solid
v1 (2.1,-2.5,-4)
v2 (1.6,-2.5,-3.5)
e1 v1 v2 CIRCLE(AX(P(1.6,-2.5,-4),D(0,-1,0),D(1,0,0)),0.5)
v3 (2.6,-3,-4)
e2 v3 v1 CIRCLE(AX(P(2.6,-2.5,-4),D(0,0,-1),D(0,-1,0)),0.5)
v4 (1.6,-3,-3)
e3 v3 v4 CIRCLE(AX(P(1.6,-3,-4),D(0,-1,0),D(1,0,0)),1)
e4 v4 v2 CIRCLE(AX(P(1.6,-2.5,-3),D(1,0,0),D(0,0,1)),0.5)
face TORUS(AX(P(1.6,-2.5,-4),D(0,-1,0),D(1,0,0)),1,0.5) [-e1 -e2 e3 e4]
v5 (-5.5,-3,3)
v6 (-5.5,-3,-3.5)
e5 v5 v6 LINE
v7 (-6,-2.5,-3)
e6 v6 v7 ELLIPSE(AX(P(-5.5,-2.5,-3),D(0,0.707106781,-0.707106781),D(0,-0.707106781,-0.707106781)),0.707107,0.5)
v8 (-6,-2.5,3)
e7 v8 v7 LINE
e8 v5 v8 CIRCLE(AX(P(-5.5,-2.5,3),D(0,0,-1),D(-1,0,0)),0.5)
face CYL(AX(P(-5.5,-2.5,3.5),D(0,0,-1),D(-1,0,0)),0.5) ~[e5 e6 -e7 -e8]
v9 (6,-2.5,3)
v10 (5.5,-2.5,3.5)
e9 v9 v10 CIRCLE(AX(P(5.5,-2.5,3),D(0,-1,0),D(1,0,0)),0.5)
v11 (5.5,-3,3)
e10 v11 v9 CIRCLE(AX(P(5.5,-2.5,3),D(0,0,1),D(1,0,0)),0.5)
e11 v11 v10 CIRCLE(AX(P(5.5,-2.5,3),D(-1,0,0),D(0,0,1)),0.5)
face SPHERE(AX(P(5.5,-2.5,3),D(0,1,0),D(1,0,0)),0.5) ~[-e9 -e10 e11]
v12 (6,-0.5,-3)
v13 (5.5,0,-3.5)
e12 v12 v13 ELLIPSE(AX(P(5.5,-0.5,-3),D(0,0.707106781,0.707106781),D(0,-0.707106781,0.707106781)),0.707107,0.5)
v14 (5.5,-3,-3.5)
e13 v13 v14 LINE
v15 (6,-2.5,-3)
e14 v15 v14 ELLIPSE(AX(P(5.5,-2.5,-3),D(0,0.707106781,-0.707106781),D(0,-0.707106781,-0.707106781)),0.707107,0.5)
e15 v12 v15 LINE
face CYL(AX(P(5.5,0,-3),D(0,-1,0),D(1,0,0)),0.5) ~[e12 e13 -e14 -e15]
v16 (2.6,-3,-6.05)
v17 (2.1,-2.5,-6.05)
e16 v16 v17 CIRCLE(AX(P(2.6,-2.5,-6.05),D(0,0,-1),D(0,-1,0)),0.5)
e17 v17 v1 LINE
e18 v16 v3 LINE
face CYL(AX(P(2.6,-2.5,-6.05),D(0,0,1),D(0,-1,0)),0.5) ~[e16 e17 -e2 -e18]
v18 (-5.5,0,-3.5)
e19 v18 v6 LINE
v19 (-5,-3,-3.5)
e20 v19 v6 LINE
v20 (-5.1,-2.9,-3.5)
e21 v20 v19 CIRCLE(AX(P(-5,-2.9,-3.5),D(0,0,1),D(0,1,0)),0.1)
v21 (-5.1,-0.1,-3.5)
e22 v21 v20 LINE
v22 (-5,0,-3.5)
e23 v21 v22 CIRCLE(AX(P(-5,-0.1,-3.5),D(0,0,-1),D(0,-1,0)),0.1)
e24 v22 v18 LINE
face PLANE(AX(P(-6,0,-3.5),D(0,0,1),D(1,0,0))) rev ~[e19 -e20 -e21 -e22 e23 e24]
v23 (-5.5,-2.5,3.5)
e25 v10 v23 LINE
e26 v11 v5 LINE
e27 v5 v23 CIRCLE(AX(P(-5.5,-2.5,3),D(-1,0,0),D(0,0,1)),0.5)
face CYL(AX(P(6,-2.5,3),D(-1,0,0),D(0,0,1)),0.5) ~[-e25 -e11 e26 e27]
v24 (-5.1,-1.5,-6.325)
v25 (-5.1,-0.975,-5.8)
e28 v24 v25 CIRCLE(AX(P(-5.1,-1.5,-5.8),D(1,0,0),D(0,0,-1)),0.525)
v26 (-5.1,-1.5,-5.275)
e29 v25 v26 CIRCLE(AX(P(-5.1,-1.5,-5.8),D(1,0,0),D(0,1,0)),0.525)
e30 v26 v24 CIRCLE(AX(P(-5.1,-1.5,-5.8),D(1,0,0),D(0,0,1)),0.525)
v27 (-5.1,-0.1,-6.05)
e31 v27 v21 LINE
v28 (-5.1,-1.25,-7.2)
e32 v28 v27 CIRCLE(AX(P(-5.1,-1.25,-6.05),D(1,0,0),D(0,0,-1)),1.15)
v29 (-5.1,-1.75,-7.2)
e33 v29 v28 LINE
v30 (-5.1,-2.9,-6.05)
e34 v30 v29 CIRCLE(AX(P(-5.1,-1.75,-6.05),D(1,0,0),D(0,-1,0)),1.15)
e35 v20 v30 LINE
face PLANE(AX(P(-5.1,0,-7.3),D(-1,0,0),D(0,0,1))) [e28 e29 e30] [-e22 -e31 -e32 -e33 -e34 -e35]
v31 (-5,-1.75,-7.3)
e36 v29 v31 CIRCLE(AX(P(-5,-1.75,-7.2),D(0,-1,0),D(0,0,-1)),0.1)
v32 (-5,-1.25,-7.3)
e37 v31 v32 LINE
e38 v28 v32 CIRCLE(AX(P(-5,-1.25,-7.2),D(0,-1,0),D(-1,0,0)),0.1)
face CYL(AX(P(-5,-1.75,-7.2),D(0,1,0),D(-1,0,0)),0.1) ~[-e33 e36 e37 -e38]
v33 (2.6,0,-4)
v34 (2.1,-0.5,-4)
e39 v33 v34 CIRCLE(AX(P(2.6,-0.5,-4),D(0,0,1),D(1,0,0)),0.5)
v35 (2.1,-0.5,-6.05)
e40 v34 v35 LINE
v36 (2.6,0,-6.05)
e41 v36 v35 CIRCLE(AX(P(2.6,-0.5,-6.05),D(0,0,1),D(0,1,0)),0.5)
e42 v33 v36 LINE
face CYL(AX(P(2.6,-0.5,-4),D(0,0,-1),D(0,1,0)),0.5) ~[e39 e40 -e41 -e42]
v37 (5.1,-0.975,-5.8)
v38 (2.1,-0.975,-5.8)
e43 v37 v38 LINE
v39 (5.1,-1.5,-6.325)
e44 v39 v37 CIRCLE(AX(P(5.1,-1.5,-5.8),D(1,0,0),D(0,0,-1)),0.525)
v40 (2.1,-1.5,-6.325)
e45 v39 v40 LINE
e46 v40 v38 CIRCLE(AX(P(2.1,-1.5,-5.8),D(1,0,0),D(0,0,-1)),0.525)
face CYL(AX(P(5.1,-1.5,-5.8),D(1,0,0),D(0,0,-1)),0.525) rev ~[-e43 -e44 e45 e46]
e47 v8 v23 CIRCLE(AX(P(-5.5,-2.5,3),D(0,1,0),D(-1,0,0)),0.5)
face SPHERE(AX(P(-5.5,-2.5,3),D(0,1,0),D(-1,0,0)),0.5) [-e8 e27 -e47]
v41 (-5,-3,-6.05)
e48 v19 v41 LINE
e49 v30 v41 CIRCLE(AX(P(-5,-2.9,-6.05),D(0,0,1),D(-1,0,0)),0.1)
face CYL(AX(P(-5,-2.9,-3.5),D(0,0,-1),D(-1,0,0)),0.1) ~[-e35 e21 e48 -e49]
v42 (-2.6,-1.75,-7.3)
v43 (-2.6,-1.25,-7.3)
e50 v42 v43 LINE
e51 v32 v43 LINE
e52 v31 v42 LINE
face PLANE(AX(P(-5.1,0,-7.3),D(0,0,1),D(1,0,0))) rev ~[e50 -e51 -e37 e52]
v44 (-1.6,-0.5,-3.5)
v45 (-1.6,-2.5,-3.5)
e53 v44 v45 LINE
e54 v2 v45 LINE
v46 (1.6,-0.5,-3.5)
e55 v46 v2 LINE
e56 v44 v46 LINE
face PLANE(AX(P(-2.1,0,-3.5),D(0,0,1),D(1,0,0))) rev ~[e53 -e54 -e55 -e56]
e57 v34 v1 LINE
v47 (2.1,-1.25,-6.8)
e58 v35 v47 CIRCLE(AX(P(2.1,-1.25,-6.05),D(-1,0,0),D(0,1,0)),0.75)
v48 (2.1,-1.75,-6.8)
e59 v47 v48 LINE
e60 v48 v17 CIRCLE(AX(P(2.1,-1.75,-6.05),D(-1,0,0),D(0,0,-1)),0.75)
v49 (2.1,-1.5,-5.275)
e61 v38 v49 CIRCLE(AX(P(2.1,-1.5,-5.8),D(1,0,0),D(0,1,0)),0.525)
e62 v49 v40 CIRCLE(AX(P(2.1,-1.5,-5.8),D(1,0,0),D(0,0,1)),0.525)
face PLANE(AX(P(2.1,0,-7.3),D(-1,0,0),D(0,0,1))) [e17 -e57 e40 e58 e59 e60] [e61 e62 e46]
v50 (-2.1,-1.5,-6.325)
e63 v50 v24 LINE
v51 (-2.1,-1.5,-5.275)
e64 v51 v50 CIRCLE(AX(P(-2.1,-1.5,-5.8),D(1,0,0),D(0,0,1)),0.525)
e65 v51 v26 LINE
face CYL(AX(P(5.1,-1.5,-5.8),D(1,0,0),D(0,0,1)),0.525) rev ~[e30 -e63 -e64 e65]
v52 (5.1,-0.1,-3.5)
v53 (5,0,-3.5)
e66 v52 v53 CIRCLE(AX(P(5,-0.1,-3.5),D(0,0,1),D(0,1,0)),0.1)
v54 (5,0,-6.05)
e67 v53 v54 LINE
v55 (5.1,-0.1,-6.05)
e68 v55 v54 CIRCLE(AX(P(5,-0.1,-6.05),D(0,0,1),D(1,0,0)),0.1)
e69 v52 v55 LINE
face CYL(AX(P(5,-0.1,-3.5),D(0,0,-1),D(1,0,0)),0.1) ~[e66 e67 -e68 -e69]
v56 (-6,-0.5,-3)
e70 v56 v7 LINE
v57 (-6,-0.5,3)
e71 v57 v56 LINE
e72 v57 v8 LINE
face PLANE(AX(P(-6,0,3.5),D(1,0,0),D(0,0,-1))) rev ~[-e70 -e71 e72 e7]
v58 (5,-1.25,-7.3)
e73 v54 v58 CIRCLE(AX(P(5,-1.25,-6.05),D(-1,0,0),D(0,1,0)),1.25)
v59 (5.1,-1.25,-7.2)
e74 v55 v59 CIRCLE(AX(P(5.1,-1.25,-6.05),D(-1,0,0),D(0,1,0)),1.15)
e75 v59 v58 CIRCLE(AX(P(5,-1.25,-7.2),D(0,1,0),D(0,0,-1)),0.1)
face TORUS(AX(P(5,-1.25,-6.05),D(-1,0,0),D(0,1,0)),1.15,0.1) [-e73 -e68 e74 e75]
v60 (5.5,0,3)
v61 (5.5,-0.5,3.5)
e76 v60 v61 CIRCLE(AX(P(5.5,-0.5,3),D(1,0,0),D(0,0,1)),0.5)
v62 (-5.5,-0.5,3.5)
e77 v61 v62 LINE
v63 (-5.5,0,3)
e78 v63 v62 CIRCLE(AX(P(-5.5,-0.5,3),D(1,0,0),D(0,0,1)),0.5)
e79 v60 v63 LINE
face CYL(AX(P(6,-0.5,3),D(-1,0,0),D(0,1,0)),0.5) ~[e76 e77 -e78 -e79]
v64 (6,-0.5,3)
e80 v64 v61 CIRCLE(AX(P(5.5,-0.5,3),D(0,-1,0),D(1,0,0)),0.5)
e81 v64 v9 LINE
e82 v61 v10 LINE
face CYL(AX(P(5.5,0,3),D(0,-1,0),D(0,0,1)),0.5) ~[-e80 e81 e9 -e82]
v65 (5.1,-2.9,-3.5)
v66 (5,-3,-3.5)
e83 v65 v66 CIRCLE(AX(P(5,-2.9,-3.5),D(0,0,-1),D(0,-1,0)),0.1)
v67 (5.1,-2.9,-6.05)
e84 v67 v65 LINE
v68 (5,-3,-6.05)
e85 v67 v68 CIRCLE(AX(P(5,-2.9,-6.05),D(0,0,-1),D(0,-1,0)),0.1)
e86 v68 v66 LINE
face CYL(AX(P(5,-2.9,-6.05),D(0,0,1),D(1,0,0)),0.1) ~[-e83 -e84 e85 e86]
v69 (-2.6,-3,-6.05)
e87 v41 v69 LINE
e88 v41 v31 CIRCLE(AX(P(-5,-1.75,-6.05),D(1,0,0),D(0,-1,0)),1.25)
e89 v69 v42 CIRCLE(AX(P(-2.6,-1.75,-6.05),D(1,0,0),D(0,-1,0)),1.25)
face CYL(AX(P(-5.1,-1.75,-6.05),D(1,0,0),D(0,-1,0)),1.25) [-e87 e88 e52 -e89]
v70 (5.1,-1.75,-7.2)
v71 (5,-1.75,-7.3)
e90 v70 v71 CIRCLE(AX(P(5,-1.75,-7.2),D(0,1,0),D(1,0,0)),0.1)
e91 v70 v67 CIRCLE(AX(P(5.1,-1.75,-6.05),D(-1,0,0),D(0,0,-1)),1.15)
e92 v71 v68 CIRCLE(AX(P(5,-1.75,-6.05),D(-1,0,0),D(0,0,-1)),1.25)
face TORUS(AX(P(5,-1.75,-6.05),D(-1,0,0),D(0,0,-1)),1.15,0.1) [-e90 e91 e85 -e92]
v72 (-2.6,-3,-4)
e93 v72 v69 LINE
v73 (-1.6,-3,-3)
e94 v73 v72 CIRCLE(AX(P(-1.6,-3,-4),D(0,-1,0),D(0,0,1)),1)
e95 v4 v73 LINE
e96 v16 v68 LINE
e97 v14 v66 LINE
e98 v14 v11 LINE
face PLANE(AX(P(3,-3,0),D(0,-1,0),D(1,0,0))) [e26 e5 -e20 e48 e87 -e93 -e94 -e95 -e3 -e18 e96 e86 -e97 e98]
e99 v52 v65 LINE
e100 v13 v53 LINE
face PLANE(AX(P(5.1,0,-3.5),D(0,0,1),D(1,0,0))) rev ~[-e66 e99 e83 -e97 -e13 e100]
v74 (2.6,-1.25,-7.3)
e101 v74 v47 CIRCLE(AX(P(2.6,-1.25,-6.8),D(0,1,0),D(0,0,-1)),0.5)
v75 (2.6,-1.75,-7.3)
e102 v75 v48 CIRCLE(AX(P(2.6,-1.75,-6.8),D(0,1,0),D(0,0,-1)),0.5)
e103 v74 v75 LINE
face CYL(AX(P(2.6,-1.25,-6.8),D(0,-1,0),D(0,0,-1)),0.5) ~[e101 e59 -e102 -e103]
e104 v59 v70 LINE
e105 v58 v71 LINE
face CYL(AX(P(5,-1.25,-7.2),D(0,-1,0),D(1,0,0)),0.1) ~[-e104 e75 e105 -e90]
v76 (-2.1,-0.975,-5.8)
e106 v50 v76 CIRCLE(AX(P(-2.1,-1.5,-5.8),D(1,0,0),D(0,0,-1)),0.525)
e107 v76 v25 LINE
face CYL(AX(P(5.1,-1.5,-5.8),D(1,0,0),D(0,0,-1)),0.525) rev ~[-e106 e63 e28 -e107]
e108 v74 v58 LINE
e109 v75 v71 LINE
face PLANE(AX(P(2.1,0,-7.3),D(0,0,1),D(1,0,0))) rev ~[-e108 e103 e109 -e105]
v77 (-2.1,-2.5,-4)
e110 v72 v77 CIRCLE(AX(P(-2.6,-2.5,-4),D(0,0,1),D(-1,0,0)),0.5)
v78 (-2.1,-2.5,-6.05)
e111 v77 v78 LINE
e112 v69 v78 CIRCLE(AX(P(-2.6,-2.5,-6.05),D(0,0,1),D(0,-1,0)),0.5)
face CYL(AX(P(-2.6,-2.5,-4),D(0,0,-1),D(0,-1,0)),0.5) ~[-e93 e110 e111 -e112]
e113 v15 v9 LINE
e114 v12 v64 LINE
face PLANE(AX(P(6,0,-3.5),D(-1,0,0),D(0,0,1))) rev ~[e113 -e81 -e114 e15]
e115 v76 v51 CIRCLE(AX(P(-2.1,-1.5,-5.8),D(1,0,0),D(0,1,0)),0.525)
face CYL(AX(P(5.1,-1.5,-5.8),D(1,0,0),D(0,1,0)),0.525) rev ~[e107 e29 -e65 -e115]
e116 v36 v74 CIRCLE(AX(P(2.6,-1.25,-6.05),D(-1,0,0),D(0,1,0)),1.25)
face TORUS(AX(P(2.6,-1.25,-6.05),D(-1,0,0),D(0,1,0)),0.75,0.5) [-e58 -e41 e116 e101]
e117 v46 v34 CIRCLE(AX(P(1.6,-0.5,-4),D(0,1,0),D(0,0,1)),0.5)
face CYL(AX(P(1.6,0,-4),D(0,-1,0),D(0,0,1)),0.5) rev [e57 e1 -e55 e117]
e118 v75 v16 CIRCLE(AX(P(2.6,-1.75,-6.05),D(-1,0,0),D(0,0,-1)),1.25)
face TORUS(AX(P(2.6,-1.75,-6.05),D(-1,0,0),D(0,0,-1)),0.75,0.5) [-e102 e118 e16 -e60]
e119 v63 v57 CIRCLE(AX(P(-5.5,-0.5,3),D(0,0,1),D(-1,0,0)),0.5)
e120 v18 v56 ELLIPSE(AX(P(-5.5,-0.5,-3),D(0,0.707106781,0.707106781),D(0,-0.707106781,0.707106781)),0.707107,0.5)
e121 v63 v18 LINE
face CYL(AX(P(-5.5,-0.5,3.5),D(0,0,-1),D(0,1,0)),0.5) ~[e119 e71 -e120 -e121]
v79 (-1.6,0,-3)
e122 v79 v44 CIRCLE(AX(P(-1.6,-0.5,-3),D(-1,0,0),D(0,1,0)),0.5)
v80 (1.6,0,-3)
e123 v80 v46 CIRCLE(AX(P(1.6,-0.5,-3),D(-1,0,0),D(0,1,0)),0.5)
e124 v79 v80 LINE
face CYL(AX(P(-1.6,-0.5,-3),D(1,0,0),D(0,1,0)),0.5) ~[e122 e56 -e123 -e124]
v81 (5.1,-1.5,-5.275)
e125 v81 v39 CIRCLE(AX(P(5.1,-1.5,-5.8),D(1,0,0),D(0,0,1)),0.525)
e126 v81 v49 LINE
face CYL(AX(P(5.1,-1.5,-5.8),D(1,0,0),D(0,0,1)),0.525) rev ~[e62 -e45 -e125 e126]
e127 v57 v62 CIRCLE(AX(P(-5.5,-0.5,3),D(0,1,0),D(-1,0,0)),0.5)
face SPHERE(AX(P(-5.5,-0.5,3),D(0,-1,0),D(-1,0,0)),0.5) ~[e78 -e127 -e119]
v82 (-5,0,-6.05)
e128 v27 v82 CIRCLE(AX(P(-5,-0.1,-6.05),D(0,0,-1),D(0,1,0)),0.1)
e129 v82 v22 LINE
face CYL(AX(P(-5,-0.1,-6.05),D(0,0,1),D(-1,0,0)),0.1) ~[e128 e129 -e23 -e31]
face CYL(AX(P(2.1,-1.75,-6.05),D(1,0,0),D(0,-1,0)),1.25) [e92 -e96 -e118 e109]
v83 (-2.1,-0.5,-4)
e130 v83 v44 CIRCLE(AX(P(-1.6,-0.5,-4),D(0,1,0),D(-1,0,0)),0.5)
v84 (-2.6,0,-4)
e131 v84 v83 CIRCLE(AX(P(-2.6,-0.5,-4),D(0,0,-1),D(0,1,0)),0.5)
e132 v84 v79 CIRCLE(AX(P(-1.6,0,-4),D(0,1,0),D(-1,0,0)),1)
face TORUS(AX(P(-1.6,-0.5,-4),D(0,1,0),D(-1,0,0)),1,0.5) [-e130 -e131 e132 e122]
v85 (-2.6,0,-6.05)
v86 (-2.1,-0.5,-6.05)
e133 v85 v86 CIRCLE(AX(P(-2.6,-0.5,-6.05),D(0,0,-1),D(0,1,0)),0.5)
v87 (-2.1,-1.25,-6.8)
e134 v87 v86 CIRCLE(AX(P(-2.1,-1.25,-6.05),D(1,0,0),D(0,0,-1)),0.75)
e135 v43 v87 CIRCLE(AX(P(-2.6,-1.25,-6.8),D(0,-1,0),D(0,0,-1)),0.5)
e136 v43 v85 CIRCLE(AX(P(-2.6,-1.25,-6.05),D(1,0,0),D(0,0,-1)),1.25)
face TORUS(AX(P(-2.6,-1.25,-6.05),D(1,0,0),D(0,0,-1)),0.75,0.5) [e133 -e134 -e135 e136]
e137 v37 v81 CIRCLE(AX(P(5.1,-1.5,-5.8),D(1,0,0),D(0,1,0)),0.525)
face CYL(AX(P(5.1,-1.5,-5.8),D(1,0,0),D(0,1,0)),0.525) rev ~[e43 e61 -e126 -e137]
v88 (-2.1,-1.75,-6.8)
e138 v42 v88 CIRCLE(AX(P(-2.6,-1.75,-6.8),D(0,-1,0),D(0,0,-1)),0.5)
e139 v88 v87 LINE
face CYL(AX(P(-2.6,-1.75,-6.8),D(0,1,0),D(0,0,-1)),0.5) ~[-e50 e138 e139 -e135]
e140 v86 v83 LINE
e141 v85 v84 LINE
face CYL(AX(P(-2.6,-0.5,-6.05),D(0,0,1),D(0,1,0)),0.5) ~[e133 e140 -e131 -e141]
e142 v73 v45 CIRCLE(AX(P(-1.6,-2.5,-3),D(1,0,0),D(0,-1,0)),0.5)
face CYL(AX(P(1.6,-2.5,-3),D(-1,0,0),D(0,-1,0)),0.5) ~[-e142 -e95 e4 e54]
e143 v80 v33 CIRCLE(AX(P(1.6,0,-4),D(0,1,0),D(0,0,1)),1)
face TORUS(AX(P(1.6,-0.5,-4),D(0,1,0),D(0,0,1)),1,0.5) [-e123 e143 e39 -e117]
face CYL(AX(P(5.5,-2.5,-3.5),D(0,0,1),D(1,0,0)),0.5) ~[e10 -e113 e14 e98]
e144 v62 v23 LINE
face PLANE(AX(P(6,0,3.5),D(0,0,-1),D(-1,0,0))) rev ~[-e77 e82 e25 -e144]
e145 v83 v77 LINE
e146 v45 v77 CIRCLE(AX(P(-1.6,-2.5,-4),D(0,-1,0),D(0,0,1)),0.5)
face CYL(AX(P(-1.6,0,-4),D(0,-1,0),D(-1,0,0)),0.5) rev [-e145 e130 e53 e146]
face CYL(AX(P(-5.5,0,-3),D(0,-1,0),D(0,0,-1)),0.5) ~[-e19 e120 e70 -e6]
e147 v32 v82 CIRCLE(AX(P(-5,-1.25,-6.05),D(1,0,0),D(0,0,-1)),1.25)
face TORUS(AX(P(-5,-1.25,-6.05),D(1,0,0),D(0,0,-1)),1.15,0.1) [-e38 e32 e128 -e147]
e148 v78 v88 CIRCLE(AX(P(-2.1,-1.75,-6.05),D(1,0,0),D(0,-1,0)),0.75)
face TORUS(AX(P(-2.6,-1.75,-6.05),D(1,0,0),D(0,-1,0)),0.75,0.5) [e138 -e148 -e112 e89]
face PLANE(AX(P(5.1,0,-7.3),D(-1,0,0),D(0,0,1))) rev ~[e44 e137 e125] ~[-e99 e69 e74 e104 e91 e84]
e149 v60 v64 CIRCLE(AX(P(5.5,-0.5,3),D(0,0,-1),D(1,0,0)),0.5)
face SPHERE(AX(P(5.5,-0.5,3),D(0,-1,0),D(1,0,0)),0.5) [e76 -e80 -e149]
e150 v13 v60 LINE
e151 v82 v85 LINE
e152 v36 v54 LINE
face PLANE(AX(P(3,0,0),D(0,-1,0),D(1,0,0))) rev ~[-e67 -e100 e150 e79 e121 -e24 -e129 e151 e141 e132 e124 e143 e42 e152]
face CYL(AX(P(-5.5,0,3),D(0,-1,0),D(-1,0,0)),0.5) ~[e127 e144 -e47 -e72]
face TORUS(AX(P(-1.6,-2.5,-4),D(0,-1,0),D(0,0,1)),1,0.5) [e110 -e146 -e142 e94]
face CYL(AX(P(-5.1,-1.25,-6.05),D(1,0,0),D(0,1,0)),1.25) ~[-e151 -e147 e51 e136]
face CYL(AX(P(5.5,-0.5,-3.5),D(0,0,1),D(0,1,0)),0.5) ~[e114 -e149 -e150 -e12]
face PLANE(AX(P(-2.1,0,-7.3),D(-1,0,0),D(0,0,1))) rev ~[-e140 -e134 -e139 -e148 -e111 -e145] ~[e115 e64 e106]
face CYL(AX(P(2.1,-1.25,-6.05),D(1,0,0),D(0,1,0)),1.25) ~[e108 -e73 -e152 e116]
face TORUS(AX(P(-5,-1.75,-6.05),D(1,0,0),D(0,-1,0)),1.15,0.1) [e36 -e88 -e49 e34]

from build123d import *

# Parameters (mm, degrees)
F0_W     = 3
F0_H     = 3.8
F1_DEPTH = 3
F3_DEPTH = 11.101
F4_R     = 1.25
F5_F1_R  = 0.5
F5_F2_R  = 0.5
F6_R     = 0.1


with BuildPart() as f1:
    # F0 (on Front) → F1 (new body)
    with BuildSketch(Plane.XZ):
        Polygon((6, -3.5), (6, 3.5), (0, 3.5), (0, -3.5), (2.1, -3.5), (5.1, -3.5), align=None)
        with Locations((3.6, -5.4)):
            Rectangle(F0_W, F0_H)
        with Locations((-3.6, -5.4)):
            Rectangle(F0_W, F0_H)
        Polygon((0, -3.5), (0, 3.5), (-6, 3.5), (-6, -3.5), (-5.1, -3.5), (-2.1, -3.5), align=None)
    extrude(amount=F1_DEPTH)

    # F2 (on face) → F3 (cut, through all)
    with BuildSketch(Plane.YZ.offset(5.1)):
        with BuildLine():
            ThreePointArc((-1.5, -5.275), (-2.025, -5.8), (-1.5, -6.325))
            Line((-1.5, -6.325), (-1.5, -5.275))
        make_face()
        with BuildLine():
            Line((-1.5, -5.275), (-1.5, -6.325))
            ThreePointArc((-1.5, -6.325), (-1.1287689399, -6.1712310601), (-0.975, -5.8))
            ThreePointArc((-0.975, -5.8), (-1.1287689399, -5.4287689399), (-1.5, -5.275))
        make_face()
    extrude(amount=-F3_DEPTH, mode=Mode.SUBTRACT)

    # F4
    f4_edges = [f1.edges().sort_by_distance(p)[0] for p in [
        (-3.6, -3, -7.3),
        (-3.6, 0, -7.3),
        (3.6, -3, -7.3),
        (3.6, 0, -7.3),
    ]]
    fillet(f4_edges, radius=F4_R)

    # F5: fillet of radius 0.5 on 14 edges, made by hand

    # F5_f1
    f5_f1_edges = [f1.edges().sort_by_distance(p)[0] for p in [
        (-2.1, -1.5, -3.5),
        (2.1, -1.5, -3.5),
    ]]
    fillet(f5_f1_edges, radius=F5_F1_R)

    # F5_f2
    f5_f2_edges = [f1.edges().sort_by_distance(p)[0] for p in [
        (0, 0, -3.5),
        (0, -3, -3.5),
        (-6, -1.5, 3.5),
        (-6, -1.5, -3.5),
        (-6, 0, 0),
        (-6, -3, 0),
        (6, -1.5, -3.5),
        (6, -1.5, 3.5),
        (6, 0, 0),
        (6, -3, 0),
        (0, 0, 3.5),
        (0, -3, 3.5),
        (-1.9535533906, -3, -3.6464466094),
        (1.9535533906, -3, -3.6464466094),
        (-1.9535533906, 0, -3.6464466094),
        (1.9535533906, 0, -3.6464466094),
    ]]
    fillet(f5_f2_edges, radius=F5_F2_R)

    # F6
    f6_edges = [f1.edges().sort_by_distance(p)[0] for p in [
        (-5.1, -2.633883, -6.933883),
        (5.1, -3, -4.775),
    ]]
    fillet(f6_edges, radius=F6_R)


solid = f1.part
